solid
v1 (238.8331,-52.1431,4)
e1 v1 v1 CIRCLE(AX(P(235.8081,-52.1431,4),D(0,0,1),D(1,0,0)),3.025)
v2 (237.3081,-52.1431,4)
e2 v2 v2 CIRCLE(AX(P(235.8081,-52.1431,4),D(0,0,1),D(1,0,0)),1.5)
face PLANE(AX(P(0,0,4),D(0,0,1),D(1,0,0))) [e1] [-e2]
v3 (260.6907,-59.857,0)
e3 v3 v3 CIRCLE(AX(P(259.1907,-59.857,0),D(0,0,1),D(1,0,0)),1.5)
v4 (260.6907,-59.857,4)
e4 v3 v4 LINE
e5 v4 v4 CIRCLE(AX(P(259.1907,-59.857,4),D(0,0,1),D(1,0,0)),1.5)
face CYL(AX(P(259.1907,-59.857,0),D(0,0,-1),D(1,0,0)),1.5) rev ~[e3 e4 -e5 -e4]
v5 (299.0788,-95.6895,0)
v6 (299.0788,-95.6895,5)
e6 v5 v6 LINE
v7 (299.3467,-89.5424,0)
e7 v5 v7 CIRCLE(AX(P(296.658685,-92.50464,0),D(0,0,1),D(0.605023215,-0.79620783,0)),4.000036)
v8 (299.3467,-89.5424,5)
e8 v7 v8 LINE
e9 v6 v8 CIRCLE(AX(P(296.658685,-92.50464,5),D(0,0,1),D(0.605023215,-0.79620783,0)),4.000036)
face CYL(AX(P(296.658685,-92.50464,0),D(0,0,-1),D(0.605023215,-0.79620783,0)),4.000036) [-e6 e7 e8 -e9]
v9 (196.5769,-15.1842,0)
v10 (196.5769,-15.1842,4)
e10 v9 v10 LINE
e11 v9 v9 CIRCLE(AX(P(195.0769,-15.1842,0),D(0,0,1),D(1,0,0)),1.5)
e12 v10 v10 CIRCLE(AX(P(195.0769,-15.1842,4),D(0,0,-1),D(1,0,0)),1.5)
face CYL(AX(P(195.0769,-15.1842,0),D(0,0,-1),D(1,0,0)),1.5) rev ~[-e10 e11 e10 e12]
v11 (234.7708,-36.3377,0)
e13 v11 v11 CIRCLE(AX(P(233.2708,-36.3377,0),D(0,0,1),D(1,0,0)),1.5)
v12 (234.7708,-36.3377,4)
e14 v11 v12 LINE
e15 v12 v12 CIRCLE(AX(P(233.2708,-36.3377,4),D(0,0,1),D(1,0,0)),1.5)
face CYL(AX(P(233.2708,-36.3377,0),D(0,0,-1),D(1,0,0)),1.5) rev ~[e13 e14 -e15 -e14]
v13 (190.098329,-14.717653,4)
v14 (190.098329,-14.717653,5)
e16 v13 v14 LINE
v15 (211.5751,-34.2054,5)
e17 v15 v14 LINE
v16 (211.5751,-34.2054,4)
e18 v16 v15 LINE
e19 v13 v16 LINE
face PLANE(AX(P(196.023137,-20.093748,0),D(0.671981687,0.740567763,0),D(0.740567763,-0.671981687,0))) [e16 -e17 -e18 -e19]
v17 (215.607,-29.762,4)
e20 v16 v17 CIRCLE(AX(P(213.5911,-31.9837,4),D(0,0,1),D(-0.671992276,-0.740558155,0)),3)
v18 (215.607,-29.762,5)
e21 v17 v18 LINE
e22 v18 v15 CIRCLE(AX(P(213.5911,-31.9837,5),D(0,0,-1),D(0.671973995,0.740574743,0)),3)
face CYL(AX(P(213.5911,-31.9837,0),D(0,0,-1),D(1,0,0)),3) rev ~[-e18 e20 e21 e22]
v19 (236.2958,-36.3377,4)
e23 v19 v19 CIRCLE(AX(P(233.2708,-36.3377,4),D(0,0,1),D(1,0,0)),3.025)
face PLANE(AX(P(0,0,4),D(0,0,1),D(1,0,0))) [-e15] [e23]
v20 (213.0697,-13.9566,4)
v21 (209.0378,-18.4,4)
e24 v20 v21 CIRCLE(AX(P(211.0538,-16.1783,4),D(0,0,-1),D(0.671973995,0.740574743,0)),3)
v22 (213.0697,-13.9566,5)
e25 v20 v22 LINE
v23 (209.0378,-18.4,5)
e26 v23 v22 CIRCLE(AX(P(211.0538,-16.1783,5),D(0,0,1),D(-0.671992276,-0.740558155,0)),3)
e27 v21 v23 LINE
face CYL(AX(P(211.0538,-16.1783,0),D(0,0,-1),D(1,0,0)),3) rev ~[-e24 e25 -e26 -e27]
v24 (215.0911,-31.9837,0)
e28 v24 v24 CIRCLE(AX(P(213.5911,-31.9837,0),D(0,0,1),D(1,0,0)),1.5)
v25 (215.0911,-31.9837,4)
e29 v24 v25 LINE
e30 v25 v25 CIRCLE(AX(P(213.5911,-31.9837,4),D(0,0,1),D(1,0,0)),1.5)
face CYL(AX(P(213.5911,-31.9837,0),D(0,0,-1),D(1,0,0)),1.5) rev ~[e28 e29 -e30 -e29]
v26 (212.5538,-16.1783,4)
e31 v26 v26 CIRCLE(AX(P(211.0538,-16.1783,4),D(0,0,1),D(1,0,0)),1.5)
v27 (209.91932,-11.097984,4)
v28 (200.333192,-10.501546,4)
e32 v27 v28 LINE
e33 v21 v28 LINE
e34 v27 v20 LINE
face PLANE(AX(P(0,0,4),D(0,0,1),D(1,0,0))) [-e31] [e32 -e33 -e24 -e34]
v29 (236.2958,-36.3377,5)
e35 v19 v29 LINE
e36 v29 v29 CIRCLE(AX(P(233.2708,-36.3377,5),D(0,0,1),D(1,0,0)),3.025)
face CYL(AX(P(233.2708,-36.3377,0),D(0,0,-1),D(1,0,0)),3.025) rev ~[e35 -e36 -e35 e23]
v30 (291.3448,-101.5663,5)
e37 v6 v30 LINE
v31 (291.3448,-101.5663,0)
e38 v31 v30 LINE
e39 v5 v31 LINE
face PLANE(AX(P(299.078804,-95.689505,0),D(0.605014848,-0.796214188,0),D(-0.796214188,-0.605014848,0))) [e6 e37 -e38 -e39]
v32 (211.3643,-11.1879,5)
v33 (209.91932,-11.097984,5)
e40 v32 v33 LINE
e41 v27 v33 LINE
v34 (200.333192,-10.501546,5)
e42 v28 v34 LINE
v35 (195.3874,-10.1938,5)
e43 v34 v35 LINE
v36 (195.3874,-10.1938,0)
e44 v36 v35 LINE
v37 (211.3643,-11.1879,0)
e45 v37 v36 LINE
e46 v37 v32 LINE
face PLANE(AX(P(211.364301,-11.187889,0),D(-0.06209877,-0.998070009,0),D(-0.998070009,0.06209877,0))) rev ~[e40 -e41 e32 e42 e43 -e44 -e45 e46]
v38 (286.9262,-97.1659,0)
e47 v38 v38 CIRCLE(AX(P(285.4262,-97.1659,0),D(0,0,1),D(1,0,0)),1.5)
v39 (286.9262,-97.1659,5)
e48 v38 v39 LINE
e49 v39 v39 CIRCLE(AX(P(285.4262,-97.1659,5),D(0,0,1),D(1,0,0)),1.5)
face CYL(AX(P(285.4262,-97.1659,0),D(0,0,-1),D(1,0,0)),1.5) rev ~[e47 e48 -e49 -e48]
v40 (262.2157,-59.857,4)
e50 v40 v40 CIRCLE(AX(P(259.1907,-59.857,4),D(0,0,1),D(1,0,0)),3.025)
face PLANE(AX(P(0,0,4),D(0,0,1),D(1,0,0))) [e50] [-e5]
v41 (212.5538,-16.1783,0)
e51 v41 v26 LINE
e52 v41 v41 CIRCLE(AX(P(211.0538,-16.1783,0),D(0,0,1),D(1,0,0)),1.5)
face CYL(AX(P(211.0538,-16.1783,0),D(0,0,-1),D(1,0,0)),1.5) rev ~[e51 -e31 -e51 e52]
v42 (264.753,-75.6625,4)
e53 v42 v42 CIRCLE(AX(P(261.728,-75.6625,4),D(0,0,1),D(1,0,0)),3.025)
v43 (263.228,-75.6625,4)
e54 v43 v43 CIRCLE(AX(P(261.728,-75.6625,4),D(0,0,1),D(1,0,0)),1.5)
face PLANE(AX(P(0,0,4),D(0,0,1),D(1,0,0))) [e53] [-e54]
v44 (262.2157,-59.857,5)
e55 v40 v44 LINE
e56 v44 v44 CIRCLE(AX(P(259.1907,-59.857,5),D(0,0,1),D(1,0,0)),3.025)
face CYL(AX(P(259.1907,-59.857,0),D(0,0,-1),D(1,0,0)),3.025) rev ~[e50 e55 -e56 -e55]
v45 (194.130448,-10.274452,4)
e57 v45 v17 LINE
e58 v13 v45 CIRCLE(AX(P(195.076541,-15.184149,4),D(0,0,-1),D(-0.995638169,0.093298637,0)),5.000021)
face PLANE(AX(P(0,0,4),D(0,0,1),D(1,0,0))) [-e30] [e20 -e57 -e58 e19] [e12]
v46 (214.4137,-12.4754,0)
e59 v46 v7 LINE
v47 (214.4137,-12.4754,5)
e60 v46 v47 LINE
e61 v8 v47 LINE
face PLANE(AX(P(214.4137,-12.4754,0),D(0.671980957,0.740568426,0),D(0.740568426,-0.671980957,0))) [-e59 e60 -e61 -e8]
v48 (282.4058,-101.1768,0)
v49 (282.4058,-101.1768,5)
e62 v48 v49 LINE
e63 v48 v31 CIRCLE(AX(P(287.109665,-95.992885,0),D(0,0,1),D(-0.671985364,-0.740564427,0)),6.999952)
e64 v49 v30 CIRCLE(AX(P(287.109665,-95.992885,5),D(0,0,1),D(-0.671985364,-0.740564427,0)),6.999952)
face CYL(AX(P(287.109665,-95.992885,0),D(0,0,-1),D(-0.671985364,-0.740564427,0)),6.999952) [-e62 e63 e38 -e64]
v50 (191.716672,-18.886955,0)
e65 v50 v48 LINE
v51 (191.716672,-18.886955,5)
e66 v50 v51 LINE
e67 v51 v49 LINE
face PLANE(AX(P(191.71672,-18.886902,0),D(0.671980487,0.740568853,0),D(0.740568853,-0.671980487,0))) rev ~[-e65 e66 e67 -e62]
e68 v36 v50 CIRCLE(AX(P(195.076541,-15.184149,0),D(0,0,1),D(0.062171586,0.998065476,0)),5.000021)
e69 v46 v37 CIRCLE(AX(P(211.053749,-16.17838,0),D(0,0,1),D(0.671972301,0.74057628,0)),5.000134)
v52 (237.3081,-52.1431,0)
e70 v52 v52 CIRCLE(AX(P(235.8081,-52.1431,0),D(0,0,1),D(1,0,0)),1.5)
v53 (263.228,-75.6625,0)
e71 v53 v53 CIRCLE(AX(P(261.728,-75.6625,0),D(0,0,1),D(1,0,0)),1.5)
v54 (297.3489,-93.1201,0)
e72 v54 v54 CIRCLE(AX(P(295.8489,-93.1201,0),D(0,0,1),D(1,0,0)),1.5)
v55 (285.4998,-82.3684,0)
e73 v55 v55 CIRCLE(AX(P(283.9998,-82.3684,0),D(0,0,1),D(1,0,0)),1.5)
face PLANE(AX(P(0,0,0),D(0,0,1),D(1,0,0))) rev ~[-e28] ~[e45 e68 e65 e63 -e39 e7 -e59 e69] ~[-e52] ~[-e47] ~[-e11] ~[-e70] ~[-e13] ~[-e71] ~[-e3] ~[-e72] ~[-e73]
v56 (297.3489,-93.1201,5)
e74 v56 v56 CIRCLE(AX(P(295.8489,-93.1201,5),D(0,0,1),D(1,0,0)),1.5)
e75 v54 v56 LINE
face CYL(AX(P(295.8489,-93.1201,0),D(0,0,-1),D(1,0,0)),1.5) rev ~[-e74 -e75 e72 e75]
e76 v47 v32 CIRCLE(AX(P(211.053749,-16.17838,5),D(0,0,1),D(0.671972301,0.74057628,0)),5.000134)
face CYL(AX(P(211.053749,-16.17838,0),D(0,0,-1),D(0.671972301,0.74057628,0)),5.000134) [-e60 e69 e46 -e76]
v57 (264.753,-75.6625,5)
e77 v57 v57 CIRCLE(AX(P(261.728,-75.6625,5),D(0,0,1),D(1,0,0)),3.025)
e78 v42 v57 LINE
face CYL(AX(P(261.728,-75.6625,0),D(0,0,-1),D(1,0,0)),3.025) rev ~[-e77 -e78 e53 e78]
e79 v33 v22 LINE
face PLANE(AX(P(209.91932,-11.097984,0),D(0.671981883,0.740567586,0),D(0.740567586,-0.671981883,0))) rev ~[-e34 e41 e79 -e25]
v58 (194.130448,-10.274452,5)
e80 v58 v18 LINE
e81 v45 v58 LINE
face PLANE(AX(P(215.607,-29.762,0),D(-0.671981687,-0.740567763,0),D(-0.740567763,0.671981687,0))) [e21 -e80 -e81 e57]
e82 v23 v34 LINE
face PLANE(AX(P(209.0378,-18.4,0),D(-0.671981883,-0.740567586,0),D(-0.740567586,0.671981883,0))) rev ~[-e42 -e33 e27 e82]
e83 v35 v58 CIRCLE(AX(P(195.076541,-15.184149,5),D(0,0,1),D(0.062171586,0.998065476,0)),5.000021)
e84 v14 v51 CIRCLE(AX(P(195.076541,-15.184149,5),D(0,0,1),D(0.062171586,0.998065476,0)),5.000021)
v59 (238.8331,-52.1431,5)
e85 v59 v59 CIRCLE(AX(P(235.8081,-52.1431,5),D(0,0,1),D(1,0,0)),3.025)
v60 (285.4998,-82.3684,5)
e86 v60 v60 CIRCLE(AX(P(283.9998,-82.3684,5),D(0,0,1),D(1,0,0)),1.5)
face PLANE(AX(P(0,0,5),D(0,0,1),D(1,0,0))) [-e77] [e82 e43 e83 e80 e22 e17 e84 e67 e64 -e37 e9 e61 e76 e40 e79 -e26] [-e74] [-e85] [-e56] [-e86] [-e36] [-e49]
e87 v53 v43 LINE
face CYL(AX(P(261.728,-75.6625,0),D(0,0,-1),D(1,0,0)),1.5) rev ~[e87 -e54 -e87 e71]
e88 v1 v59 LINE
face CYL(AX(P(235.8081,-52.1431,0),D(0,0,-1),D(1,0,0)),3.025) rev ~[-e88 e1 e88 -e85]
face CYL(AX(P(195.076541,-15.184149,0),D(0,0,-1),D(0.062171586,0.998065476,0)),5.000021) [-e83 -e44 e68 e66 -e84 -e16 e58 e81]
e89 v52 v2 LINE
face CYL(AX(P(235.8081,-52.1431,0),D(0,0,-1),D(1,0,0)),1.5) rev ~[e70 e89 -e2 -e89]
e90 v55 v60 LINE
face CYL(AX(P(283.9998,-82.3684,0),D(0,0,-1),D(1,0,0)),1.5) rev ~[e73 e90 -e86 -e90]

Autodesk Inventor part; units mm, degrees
ref_plane "YZ Plane" through (0, 0, 0) normal (1, 0, 0) x (0, 1, 0)
ref_plane "XZ Plane" through (0, 0, 0) normal (0, 1, 0) x (-1, 0, 0)
ref_plane "XY Plane" through (0, 0, 0) normal (0, 0, 1) x (1, 0, 0)
sketch "スケッチ1" plane through (0, 0, 0) normal (0, 0, 1) x (1, 0, 0)
  circle A0 centre (211.0538, -16.1783) radius 3
  circle A1 centre (195.0769, -15.1842) radius 3
  circle A2 centre (213.5911, -31.9837) radius 3
  line L0 (195.0769, -15.1842) -> (213.5911, -31.9837) construction
  line L1 (185.1065, 0.6143) -> (518.3624, -301.7771) construction
  circle A3 centre (185.1065, 0.6143) radius 8
  line L2 (204.334, -23.584) -> (211.0538, -16.1783) construction
  line L3 (185.1065, 0.6143) -> (181.7466, -3.0885)
  line L4 (181.7466, -3.0885) -> (195.0769, -15.1842)
  line L5 (211.0538, -16.1783) -> (195.0769, -15.1842) construction
  line L6 (213.748, -11.3362) -> (182.759, -9.4081)
  line L7 (186.8707, -14.4897) -> (289.472, -107.5885)
  arc A4 (195.3874, -10.1938) -> (196.9446, -10.5462) centre (195.0769, -15.1842) ccw
  arc A5 (214.4137, -12.4754) -> (211.3643, -11.1879) centre (211.0538, -16.1783) ccw
  line L8 (214.4137, -12.4754) -> (302.9116, -92.7771)
  line L9 (302.9116, -92.7771) -> (289.472, -107.5885) construction
  circle A6 centre (295.8489, -93.1201) radius 3.025
  circle A7 centre (285.4262, -97.1659) radius 3.025
  circle A8 centre (283.9998, -82.3684) radius 3.025
  line L10 (281.7596, -80.3356) -> (285.1195, -76.6328)
  line L11 (285.1195, -76.6328) -> (289.5999, -80.6983)
  line L12 (289.5999, -80.6983) -> (286.24, -84.4011)
  line L13 (286.24, -84.4011) -> (281.7596, -80.3356) construction
  arc A9 (282.4058, -101.1768) -> (291.3448, -101.5663) centre (287.1097, -95.9928) ccw
  line L14 (302.9116, -92.7771) -> (291.3448, -101.5663)
  arc A10 (299.0788, -95.6895) -> (299.3467, -89.5424) centre (296.6588, -92.5047) ccw
  circle A11 centre (295.8489, -93.1201) radius 1.5
  circle A12 centre (285.4262, -97.1659) radius 1.5
  line L15 (213.5911, -31.9837) -> (181.7466, -3.0885) construction
  line L16 (215.607, -29.762) -> (183.7626, -0.8668)
  line L17 (179.7307, -5.3102) -> (211.5751, -34.2054)
  arc A13 (211.5751, -34.2054) -> (215.607, -29.762) centre (213.5911, -31.9837) ccw
  arc A14 (183.7626, -0.8668) -> (179.7307, -5.3102) centre (181.7466, -3.0885) ccw
  line L18 (211.0538, -16.1783) -> (189.2132, 3.6395) construction
  line L19 (209.0378, -18.4) -> (187.1973, 1.4178)
  line L20 (191.2292, 5.8612) -> (213.0697, -13.9566)
  arc A15 (209.0378, -18.4) -> (213.0697, -13.9566) centre (211.0538, -16.1783) ccw
  arc A16 (191.2292, 5.8612) -> (187.1973, 1.4178) centre (189.2132, 3.6395) ccw
  circle A17 centre (195.0769, -15.1842) radius 1.5
  circle A18 centre (211.0538, -16.1783) radius 1.5
  circle A19 centre (213.5911, -31.9837) radius 1.5
  circle A20 centre (283.9998, -82.3684) radius 1.5
  circle A21 centre (233.2708, -36.3377) radius 3.025
  circle A22 centre (235.8081, -52.1431) radius 3.025
  circle A23 centre (259.1907, -59.857) radius 3.025
  circle A24 centre (261.728, -75.6625) radius 3.025
  line L21 (211.0538, -16.1783) -> (283.9998, -82.3684) construction
  line L22 (285.4262, -97.1659) -> (213.5911, -31.9837) construction
  circle A25 centre (233.2708, -36.3377) radius 1.5
  circle A26 centre (235.8081, -52.1431) radius 1.5
  circle A27 centre (259.1907, -59.857) radius 1.5
  circle A28 centre (261.728, -75.6625) radius 1.5
  point P0 (0, 0)
  point P1 (0, 0)
  point P2 (207.6939, -19.8811)
  point P3 (191.717, -18.887)
  point P4 (197.6688, -17.5361)
  point P5 (200.1335, -6.2694)
  point P6 (209.9194, -11.098)
  point P7 (200.3333, -10.5016)
  point P8 (194.1305, -10.2746)
  point P9 (196.0232, -20.0938)
  point P10 (289.5999, -80.6983)
  point P11 (286.24, -84.4011)
  point P12 (190.0986, -14.718)
  dimension "d13" = 6.05
  dimension "d0" = 6
  dimension "d1" = 25
  dimension "d2" = 10
  dimension "d3" = 18
  dimension "d4" = 5
  dimension "d5" = 5
  dimension "d6" = 150
  dimension "d7" = 6.05
  dimension "d8" = 5
  dimension "d9" = 5
  dimension "d10" = 6.05
  dimension "d11" = 5
  dimension "d12" = 10
  dimension "d14" = 5
  dimension "d15" = 16
  dimension "d16" = 4
  dimension "d17" = 7
  dimension "d18" = 4
  dimension "d19" = 3
  dimension "d20" = 3
  dimension "d23" = 3
  dimension "d24" = 3
  dimension "d25" = 3
  dimension "d26" = 3
  dimension "d29" = 30
  dimension "d30" = 30
  dimension "d31" = 35
  dimension "d32" = 35
  dimension "d33" = 3
  dimension "d34" = 3
  dimension "d35" = 3
  dimension "d36" = 3
extrude "押し出し1" add sketch "スケッチ1" along normal blind 5 contours A0 L20 L6 A5 L8 L10 A8 L12 A10 L14 A9 L7 A4 L17 A2 L16 L19 | L8 L12 A8 L10 | A8 | L17 A4 | A6 | A7
extrude "押し出し2" add sketch "スケッチ1" along normal blind 4 contours A0 | A0 L19 L6 L20 | L16 A1 L4 A4 | L4 A1 L17 A4 | L16 A4 L17 A1 | A1 | L16 A2 L17 A4 | A2 | A21 | A22 | A23 | A24
properties part number "アーム先1" material "ポリカーボネート、スモーク"
